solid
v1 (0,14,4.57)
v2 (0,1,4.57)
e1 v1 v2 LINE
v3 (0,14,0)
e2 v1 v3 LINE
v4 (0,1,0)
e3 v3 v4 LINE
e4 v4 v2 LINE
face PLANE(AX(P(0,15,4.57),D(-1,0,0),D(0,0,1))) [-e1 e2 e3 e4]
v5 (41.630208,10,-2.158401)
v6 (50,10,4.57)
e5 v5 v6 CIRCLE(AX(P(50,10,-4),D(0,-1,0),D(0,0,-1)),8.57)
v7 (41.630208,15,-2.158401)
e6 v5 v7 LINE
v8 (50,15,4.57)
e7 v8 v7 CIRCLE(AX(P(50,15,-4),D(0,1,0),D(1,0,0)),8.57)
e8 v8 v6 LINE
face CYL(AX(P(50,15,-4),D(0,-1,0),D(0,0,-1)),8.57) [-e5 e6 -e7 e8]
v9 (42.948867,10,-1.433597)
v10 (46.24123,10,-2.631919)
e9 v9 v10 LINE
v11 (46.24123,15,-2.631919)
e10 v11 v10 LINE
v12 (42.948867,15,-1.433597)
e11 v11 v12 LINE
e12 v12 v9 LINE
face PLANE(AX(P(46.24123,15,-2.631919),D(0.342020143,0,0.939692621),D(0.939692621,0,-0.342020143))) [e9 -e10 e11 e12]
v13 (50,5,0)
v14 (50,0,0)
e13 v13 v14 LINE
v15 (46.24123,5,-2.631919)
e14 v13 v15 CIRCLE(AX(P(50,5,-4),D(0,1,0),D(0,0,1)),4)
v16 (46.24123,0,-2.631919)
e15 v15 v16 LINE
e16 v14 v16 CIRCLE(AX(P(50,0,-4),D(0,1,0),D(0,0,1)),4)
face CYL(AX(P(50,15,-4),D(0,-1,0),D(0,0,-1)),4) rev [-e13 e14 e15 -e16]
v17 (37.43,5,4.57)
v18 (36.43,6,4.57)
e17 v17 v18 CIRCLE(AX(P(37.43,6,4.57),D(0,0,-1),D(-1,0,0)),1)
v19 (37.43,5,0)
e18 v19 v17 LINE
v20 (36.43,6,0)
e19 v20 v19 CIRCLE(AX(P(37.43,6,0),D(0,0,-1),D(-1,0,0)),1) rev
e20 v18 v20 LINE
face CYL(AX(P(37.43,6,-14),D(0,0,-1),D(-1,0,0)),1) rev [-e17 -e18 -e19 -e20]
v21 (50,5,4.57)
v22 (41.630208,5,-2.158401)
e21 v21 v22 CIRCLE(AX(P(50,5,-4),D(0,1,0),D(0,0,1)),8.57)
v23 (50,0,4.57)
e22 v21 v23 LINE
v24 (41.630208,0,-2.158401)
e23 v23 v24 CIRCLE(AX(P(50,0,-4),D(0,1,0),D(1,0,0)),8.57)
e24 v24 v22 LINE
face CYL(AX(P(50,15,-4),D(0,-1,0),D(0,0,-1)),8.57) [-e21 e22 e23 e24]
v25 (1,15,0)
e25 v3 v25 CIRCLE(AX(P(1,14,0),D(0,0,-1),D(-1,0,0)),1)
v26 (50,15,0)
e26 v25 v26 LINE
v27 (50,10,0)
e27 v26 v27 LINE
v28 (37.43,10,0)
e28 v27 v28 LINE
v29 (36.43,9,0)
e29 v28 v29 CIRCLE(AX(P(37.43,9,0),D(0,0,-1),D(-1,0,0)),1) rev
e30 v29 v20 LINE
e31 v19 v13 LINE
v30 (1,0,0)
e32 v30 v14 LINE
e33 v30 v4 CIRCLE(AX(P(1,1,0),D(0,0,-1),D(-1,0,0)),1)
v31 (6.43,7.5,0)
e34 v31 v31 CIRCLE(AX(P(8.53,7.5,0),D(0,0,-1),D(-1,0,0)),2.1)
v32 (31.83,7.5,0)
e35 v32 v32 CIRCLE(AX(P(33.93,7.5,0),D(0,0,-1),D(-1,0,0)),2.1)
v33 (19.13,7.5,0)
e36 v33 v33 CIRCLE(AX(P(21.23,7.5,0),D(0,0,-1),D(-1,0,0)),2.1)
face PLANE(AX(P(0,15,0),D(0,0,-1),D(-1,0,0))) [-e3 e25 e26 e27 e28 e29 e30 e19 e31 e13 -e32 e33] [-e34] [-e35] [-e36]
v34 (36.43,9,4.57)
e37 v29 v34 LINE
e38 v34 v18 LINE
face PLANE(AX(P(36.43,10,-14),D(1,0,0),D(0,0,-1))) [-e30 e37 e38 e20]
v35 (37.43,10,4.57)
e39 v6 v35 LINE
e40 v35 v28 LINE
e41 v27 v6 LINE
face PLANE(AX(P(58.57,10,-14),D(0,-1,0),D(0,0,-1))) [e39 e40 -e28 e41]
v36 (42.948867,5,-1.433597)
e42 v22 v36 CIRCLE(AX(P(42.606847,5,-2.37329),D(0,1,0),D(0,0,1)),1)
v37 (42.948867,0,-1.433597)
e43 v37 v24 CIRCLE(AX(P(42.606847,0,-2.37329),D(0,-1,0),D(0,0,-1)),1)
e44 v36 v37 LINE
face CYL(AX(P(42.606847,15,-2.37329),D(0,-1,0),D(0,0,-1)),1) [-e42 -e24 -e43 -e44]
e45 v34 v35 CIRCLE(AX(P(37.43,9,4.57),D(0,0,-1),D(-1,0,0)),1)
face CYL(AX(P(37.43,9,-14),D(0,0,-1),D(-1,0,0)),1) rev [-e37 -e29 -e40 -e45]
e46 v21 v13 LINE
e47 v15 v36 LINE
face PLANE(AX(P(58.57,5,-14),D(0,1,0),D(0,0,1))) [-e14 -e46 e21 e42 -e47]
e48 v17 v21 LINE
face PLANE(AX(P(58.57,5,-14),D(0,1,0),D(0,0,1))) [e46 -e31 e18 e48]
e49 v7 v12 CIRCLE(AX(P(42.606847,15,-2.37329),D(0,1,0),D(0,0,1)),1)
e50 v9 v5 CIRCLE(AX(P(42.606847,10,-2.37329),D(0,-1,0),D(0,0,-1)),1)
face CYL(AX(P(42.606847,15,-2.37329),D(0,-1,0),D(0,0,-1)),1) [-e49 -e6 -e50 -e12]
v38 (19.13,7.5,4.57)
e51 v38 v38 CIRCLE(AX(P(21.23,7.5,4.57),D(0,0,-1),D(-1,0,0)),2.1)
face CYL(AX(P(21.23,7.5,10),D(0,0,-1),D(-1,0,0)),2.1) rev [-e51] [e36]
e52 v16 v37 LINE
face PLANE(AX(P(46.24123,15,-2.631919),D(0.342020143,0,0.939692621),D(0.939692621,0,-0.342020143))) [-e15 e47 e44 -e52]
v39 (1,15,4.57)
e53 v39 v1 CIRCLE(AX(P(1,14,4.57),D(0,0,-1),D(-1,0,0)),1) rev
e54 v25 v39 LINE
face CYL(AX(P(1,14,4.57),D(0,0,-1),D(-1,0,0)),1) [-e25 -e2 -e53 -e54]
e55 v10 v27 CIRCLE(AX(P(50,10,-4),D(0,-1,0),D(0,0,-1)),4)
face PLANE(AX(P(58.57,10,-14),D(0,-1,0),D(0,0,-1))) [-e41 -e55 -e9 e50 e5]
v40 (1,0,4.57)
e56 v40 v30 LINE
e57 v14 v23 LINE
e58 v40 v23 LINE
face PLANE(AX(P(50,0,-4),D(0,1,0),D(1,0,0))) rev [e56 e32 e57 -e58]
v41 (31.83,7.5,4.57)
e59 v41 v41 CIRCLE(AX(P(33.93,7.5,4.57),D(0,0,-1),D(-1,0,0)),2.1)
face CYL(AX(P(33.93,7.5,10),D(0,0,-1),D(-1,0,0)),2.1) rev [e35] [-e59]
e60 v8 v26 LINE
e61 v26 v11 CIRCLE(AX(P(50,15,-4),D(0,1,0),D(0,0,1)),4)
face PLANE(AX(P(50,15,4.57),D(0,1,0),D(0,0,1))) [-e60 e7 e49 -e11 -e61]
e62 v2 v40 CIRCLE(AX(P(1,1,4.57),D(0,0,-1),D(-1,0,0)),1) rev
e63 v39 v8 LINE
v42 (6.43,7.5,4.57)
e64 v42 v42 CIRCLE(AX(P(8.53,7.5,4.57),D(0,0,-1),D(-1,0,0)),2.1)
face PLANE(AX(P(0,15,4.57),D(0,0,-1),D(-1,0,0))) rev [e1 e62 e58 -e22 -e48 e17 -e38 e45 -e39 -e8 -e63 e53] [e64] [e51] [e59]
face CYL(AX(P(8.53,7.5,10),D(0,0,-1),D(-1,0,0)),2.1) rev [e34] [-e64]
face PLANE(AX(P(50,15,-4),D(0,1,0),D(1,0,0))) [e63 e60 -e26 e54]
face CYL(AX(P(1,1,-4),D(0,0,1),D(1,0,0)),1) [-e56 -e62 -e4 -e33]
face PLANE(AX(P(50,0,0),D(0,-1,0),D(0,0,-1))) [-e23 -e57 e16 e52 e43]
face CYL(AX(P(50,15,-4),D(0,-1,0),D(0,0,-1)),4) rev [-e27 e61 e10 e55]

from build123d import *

# Parameters (mm, degrees)
BASE_FLANGE1_DEPTH      = 15
CUT_EXTRUDE1_DEPTH      = 14
CUT_EXTRUDE1_DEPTH_BACK = 10
SKETCH6_W               = 22.14
SKETCH6_H               = 5
FILLET1_R               = 1
SKETCH7_R               = 2.1
CUT_EXTRUDE2_DEPTH      = 10


# Sheet-metal steps are written as plain solids
with BuildPart() as part:
    # Sketch1 → Base-Flange1 (new body)
    with BuildSketch(Plane(origin=(0, 0, 0), x_dir=(1, 0, 0), z_dir=(0, 1, 0))):
        with BuildLine():
            Line((0, 0), (50, 0))
            ThreePointArc((50, 0), (52.294305745, 7.276608177), (46.241229517, 2.631919427))
            Line((46.241229517, 2.631919427), (41.94683424, 1.068887372))
            ThreePointArc((41.94683424, 1.068887372), (54.91555006, 11.02013302), (50, -4.57))
            Line((50, -4.57), (0, -4.57))
            Line((0, -4.57), (0, 0))
        make_face()
    extrude(amount=BASE_FLANGE1_DEPTH)

    # Sketch6 → Cut-Extrude1 (cut, two sides: drawn at the far end of the back side and taken through both)
    with BuildSketch(Plane(origin=(0, 0, 0), x_dir=(-1, 0, 0), z_dir=(0, 0, -1)).offset(-CUT_EXTRUDE1_DEPTH_BACK)):
        with Locations((-47.5, 7.5)):
            Rectangle(SKETCH6_W, SKETCH6_H)
    extrude(amount=CUT_EXTRUDE1_DEPTH + CUT_EXTRUDE1_DEPTH_BACK, mode=Mode.SUBTRACT)

    # Fillet1
    fillet1_edges = [part.edges().sort_by_distance(p)[0] for p in [
        (41.94683424, 12.5, -1.068887372),
        (0, 15, 2.285),
        (41.94683424, 2.5, -1.068887372),
        (36.43, 5, 2.285),
        (36.43, 10, 2.285),
        (0, 0, 2.285),
    ]]
    fillet(fillet1_edges, radius=FILLET1_R)

    # Sketch7 → Cut-Extrude2 (cut)
    with BuildSketch(Plane(origin=(0, 0, 0), x_dir=(-1, 0, 0), z_dir=(0, 0, -1))):
        with Locations((-21.23, 7.5)):
            Circle(SKETCH7_R)
        with Locations((-33.93, 7.5)):
            Circle(SKETCH7_R)
        with Locations((-8.53, 7.5)):
            Circle(SKETCH7_R)
    extrude(amount=-CUT_EXTRUDE2_DEPTH, mode=Mode.SUBTRACT)


solid = part.part
